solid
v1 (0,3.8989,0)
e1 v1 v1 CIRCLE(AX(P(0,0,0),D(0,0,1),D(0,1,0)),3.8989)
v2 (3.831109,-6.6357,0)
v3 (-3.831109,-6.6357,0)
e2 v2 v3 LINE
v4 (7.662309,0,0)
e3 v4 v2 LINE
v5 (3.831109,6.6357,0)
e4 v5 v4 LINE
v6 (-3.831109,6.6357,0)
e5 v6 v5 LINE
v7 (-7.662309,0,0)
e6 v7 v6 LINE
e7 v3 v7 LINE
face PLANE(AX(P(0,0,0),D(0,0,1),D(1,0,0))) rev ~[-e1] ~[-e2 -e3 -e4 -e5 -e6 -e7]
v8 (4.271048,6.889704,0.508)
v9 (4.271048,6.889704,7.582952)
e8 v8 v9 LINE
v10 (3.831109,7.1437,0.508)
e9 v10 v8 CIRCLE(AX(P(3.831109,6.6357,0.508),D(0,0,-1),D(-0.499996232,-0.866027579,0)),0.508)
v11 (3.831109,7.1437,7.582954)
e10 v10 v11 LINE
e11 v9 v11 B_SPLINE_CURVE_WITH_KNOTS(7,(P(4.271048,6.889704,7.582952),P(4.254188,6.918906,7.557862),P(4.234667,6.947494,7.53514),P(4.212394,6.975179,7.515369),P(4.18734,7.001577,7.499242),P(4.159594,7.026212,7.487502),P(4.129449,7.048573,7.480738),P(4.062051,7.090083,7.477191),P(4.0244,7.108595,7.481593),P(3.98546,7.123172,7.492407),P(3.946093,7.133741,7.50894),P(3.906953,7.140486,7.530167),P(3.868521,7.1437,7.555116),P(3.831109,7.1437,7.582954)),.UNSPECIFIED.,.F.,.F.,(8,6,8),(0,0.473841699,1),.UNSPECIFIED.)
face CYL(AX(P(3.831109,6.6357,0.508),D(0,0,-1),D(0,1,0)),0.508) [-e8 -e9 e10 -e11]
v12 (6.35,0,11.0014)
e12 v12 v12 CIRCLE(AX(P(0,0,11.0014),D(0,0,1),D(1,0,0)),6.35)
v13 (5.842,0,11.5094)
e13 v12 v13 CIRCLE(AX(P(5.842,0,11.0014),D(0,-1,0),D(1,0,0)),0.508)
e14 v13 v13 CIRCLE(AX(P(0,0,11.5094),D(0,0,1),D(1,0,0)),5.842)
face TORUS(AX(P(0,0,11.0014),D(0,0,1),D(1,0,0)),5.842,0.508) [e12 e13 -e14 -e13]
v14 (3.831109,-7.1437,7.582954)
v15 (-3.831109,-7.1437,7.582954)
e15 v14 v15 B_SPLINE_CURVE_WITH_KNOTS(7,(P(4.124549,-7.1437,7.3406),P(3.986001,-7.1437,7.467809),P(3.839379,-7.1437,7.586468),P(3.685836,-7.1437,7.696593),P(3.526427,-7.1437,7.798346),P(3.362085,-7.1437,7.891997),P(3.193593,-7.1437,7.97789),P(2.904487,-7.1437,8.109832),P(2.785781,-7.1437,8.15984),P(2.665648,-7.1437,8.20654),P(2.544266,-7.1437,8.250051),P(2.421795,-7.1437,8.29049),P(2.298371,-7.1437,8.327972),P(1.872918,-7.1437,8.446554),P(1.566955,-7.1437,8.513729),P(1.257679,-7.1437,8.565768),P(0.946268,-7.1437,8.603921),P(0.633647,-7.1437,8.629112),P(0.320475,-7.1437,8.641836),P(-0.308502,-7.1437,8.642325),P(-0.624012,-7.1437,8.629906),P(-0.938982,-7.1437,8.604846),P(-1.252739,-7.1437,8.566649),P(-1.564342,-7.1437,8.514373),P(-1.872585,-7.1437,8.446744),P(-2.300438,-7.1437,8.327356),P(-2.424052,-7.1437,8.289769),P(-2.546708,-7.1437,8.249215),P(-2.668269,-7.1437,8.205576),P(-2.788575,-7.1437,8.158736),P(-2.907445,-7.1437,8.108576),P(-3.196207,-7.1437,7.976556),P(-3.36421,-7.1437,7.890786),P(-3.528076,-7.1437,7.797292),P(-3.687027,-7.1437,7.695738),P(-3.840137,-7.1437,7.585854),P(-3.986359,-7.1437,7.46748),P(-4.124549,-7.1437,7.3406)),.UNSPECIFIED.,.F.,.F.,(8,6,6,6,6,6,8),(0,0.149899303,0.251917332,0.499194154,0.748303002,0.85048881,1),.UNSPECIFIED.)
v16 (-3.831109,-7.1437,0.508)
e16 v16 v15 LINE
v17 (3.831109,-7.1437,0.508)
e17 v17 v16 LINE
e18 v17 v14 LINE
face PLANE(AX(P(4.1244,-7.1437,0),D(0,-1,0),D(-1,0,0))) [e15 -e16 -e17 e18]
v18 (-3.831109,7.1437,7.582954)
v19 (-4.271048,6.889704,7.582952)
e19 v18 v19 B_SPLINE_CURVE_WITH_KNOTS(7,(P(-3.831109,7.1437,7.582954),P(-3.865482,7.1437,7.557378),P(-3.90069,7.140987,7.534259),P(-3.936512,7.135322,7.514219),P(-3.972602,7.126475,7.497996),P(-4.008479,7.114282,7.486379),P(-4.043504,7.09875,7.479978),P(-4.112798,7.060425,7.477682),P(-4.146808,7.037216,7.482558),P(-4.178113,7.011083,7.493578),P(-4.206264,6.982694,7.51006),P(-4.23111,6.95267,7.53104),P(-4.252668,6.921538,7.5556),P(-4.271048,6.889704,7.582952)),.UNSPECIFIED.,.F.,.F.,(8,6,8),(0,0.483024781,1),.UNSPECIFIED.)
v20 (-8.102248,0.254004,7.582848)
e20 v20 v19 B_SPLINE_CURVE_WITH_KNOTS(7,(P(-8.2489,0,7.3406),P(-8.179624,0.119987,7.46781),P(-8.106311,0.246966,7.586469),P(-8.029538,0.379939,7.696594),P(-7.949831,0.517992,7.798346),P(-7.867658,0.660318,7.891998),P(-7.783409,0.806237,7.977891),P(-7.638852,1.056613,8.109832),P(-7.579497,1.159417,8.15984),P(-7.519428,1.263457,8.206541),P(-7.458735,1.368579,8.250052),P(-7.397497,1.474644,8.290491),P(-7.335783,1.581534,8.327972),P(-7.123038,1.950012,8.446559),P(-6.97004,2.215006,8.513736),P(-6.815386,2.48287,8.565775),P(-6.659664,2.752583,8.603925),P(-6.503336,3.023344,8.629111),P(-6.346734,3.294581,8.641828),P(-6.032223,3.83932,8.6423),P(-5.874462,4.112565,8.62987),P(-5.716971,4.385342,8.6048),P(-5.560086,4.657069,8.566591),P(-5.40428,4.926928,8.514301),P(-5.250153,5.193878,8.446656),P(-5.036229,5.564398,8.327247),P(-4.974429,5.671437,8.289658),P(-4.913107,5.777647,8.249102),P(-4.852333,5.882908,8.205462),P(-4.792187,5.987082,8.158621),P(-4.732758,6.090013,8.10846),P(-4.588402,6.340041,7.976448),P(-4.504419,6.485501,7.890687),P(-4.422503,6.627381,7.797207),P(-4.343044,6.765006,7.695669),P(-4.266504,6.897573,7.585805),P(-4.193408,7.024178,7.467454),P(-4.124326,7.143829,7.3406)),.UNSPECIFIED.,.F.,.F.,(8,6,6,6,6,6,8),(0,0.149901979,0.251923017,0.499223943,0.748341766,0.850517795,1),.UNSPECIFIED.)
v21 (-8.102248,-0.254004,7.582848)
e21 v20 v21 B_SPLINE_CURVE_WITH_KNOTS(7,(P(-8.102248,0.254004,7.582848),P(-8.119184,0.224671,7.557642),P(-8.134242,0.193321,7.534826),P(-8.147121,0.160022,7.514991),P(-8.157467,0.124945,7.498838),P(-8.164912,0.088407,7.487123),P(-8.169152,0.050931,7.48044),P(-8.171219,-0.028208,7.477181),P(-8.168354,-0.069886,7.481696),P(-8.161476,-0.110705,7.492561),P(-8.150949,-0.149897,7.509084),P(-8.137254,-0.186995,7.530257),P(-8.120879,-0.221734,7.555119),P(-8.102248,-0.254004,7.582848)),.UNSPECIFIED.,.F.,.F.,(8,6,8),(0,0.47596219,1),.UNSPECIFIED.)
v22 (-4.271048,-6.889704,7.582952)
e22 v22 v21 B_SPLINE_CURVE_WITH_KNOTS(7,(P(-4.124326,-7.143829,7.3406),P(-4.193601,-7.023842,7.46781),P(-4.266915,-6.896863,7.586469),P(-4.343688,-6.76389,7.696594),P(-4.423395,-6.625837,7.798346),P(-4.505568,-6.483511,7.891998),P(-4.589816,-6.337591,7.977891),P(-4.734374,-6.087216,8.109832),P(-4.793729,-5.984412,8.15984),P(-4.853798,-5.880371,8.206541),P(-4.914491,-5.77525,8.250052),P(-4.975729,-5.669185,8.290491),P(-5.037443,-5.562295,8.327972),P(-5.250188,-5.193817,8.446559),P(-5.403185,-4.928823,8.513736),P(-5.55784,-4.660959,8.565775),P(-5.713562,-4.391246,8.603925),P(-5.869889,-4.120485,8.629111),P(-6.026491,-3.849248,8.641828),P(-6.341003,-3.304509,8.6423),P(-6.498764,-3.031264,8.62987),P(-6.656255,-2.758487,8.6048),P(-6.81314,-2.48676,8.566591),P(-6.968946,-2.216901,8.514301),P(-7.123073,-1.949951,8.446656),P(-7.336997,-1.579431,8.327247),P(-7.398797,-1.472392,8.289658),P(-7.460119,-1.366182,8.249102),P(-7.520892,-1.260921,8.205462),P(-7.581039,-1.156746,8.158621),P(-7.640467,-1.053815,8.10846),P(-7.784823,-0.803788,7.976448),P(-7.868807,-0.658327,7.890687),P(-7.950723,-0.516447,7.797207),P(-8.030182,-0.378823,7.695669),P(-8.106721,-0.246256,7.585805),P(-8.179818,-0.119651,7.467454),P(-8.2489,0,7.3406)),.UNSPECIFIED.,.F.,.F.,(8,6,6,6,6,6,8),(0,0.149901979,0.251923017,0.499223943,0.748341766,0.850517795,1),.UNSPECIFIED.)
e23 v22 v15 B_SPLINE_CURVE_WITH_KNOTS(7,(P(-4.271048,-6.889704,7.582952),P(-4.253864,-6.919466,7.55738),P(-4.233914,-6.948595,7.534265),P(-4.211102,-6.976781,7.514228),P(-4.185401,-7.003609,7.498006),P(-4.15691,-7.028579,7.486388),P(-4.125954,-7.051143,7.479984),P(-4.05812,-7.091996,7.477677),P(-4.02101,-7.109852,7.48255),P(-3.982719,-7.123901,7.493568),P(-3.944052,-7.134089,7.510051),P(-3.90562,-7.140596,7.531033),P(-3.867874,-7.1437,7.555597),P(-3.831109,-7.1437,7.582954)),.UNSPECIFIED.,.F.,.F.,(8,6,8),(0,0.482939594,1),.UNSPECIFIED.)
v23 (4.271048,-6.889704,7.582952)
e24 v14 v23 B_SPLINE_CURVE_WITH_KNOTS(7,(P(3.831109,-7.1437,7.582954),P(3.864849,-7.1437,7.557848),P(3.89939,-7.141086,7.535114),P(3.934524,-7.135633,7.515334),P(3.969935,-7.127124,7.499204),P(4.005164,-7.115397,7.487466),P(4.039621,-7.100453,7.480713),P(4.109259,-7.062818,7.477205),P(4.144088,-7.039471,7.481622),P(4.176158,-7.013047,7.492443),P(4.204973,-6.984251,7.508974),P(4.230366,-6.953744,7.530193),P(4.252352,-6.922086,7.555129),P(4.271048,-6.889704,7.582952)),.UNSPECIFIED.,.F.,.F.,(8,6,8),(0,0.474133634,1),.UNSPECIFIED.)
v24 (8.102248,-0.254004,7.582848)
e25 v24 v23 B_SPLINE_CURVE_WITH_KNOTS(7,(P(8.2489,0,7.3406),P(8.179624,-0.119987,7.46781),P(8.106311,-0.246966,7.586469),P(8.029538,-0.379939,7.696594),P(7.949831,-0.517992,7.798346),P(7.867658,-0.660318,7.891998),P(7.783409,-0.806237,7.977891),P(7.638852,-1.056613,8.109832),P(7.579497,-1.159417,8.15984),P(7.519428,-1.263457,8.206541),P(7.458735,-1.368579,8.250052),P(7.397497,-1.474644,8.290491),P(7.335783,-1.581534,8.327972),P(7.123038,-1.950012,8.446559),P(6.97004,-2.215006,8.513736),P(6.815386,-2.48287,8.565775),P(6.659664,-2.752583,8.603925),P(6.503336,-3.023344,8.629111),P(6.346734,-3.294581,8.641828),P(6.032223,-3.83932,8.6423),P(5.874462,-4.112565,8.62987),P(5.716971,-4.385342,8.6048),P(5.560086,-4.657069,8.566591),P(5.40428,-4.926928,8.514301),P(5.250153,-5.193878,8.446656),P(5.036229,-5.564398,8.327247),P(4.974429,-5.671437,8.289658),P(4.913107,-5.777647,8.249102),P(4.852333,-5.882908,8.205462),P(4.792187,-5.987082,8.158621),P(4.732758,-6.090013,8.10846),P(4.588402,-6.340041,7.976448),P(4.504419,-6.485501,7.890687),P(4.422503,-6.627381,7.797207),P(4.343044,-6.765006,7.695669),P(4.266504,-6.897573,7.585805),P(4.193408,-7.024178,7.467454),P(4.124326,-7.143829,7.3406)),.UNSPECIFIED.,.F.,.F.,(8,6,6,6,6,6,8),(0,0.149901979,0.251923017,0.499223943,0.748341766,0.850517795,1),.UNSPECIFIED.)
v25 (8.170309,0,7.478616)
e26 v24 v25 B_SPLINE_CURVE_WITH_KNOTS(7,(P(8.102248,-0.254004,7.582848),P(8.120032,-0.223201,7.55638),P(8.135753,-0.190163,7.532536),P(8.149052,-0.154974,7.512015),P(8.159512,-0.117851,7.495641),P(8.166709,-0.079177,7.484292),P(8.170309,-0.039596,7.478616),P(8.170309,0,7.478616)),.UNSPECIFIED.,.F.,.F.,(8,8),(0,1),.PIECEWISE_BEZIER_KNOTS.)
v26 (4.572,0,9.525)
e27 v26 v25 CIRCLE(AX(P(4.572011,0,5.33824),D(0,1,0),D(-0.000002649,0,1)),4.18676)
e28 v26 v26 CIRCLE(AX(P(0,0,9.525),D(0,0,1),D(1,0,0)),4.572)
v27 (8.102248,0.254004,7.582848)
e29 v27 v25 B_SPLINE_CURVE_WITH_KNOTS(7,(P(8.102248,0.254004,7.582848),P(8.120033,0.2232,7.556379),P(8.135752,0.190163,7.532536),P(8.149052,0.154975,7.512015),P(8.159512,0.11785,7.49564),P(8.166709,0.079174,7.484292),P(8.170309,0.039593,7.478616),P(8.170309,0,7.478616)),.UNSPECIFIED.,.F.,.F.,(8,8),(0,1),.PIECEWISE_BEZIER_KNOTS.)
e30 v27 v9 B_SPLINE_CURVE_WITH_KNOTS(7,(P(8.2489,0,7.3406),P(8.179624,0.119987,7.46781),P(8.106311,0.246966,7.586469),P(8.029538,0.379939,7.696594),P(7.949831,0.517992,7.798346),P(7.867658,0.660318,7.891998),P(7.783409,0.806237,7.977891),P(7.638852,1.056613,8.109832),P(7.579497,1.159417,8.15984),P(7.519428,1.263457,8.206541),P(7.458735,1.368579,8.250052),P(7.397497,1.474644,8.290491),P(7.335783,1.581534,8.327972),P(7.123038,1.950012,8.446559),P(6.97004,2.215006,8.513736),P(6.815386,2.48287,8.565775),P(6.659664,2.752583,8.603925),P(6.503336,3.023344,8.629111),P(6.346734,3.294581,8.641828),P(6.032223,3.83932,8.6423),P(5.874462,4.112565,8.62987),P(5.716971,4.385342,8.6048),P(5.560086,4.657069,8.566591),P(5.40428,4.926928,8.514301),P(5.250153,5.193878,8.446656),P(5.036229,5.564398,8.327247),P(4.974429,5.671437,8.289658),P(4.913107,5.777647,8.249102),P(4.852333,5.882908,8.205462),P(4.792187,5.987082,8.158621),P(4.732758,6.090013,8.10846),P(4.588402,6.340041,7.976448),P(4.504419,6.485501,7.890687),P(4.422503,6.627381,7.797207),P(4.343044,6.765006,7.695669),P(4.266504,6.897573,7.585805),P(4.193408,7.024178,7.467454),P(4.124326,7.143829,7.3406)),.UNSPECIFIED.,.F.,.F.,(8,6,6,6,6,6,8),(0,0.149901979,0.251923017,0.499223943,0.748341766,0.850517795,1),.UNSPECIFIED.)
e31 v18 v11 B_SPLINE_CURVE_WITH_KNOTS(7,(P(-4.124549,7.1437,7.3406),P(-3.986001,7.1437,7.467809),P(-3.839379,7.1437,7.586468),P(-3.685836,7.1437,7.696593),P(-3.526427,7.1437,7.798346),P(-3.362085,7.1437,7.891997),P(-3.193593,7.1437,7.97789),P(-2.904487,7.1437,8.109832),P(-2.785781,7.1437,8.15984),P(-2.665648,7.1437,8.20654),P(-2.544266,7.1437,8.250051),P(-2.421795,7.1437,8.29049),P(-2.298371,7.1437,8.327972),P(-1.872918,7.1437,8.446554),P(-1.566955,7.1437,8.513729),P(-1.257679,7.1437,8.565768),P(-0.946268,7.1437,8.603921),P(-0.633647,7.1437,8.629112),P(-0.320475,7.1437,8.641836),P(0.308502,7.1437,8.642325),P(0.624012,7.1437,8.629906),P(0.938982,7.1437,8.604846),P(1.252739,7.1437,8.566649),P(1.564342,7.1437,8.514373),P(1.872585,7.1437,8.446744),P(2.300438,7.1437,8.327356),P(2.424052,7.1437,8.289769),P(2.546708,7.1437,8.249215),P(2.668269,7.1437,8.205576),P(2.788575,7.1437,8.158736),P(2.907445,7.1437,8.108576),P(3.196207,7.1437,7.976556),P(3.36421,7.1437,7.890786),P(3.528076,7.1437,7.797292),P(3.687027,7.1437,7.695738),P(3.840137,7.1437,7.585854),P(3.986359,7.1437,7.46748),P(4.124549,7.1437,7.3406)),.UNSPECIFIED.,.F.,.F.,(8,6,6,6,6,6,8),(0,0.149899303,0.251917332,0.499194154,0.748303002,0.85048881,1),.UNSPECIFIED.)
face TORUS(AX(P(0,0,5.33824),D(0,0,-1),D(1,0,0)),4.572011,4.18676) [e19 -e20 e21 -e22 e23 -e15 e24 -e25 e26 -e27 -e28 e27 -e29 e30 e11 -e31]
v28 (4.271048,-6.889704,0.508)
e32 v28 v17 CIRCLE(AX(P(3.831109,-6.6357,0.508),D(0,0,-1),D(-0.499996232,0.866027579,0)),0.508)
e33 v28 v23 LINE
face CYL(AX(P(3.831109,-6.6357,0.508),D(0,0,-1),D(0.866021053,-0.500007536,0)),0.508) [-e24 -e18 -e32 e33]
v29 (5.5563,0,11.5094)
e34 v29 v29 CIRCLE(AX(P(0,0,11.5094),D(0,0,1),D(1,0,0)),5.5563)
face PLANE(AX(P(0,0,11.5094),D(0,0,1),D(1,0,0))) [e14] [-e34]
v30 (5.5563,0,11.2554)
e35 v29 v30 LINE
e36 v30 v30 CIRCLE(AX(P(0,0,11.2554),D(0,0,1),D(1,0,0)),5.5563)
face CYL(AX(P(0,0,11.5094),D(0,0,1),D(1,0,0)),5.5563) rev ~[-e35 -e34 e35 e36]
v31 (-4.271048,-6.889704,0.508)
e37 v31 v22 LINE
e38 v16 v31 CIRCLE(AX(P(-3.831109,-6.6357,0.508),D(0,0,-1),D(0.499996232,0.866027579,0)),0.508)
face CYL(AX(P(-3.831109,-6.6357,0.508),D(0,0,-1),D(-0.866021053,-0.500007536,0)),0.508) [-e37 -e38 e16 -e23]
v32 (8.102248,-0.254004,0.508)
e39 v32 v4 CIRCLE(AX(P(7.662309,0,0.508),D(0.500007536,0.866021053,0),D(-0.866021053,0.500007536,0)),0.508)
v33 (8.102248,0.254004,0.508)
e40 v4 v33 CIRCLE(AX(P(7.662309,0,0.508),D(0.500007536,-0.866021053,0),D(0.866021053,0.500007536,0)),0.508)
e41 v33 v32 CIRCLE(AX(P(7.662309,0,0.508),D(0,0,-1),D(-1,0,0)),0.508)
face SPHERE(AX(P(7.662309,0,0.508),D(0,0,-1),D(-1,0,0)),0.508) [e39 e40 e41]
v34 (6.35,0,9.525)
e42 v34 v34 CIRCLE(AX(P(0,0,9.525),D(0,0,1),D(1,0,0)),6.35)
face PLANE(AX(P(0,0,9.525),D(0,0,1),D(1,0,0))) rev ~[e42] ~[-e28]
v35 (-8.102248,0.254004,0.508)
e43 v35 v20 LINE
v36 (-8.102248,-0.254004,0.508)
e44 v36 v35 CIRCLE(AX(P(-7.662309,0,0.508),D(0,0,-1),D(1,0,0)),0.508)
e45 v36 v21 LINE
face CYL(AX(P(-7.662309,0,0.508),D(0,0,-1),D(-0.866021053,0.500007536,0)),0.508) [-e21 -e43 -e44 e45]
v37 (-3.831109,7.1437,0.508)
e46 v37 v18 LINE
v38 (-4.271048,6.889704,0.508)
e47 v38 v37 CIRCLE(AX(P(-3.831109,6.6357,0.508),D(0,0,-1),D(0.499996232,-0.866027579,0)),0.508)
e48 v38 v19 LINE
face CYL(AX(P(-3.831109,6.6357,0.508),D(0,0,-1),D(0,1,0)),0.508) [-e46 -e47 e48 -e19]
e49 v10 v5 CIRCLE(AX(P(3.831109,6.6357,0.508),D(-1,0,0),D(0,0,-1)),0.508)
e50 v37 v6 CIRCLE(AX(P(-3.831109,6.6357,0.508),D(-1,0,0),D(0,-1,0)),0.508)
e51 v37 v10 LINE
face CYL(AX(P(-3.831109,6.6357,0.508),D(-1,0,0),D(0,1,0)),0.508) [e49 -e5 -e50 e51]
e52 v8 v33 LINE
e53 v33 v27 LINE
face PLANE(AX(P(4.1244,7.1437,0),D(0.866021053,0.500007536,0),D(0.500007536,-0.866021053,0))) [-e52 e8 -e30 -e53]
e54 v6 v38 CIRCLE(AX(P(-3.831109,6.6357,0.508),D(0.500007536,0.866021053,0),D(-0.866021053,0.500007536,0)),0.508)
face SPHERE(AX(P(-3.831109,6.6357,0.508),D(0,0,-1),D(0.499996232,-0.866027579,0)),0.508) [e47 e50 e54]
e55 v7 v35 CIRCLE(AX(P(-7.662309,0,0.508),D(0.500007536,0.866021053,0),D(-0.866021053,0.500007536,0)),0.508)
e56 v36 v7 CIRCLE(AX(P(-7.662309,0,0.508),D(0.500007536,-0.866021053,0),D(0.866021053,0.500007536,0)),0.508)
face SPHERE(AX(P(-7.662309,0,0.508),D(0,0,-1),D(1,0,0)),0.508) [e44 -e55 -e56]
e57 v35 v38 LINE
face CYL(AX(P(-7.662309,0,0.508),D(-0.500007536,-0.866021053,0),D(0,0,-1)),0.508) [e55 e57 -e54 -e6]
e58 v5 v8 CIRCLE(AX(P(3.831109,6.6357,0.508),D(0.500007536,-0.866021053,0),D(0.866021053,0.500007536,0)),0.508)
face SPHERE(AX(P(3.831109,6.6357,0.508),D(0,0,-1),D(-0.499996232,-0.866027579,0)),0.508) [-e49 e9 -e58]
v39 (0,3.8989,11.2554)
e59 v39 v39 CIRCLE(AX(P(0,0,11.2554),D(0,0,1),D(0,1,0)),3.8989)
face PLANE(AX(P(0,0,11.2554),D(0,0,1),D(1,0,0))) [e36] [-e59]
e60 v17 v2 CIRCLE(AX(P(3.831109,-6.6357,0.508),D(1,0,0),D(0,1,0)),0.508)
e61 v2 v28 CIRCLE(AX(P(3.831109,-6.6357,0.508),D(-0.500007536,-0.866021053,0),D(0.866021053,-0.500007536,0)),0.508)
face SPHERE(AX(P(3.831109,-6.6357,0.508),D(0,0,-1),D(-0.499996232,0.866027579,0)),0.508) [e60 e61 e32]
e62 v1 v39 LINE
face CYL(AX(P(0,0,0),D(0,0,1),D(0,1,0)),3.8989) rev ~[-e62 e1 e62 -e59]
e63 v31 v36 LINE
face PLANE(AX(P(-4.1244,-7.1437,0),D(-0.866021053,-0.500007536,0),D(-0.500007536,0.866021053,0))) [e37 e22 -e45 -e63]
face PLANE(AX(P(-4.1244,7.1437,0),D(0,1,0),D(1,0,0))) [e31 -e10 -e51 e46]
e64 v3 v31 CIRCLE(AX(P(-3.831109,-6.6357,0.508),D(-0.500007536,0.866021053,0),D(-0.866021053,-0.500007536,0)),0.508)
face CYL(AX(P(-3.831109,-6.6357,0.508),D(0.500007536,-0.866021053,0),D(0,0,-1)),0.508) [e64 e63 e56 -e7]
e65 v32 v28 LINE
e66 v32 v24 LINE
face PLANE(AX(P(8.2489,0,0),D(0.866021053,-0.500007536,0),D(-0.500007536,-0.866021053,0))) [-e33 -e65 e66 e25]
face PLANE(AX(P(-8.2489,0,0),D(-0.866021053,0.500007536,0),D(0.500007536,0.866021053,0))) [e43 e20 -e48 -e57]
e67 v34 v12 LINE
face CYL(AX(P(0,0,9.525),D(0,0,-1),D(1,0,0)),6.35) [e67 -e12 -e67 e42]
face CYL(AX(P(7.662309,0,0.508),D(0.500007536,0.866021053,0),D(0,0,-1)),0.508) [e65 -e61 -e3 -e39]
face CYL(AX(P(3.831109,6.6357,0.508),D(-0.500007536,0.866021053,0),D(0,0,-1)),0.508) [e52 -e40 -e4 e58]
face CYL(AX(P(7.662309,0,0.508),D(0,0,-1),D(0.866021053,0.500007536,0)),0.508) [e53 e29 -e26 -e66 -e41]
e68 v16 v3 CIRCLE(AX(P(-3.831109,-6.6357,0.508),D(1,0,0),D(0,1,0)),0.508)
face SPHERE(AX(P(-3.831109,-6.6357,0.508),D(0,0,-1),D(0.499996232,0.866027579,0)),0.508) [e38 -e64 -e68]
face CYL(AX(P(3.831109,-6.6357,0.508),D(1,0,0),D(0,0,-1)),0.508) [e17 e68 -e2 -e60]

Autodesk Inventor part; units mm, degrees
ref_plane "YZ Plane" through (0, 0, 0) normal (1, 0, 0) x (0, 1, 0)
ref_plane "XZ Plane" through (0, 0, 0) normal (0, 1, 0) x (-1, 0, 0)
ref_plane "XY Plane" through (0, 0, 0) normal (0, 0, 1) x (1, 0, 0)
sketch "Sketch1" plane through (0, 0, 0) normal (0, 0, 1) x (1, 0, 0)
  line L0 (-4.1244, 7.1437) -> (4.1244, 7.1437)
  line L1 (4.1244, 7.1437) -> (8.2489, 0)
  line L2 (8.2489, 0) -> (4.1244, -7.1437)
  line L3 (4.1244, -7.1437) -> (-4.1244, -7.1437)
  line L4 (-4.1244, -7.1437) -> (-8.2489, 0)
  line L5 (-8.2489, 0) -> (-4.1244, 7.1437)
  point P0 (0, 0)
  point P1 (0, 0)
  dimension "d0" = 14.2875
extrude "Extrusion1" add sketch "Sketch1" along normal blind 9.525
sketch "Sketch3" plane through (0, 0, 9.525) normal (0, 0, 1) x (1, 0, 0)
  circle A0 centre (0, 0) radius 6.35
  dimension "d3" = 12.7
extrude "Extrusion2" add sketch "Sketch3" along normal blind 1.9844
sketch "Sketch8" plane through (0, 0, 11.5094) normal (0, 0, 1) x (1, 0, 0)
  circle A0 centre (0, 0) radius 6.35 projected
  circle A1 centre (0, 0) radius 5.5563
  circle A2 centre (0, 0) radius 5.1594
  dimension "d14" = 11.1125
  dimension "d28" = 10.3187
extrude "Extrusion3" cut sketch "Sketch8" against normal blind 0.254 contours A1 | A2
sketch "Sketch9" plane through (0, 0, 0) normal (0, 0, -1) x (-1, 0, 0)
  point P0 (0, 0)
hole "Hole2" at (0, 0, 0) direction (0, 0, 1) diameter 7.7978 end through all thread size "3/8-16 UNC" class "2B" standard "ANSI Unified Screw Threads"
sketch "Sketch10" plane through (0, 0, 0) normal (0, 1, 0) x (-1, 0, 0)
  line L0 (-8.2489, 9.525) -> (-4.1244, 9.525) projected
  line L1 (-4.1244, 0) -> (-4.1244, 9.525) projected
  line L2 (-8.2489, 0) -> (-4.1244, 0) projected
  line L3 (-8.2489, 0) -> (-8.2489, 9.525) projected
  line L4 (0, 0) -> (0, 6.9243)
  arc A0 (-4.572, 9.525) -> (-8.2489, 7.3406) centre (-4.572, 5.3382) ccw
  line L5 (-8.2489, 7.3406) -> (-8.2489, 9.525)
  line L6 (-4.572, 9.525) -> (-8.2489, 9.525)
  dimension "d24" = 4.572
revolve "Revolution2" cut sketch "Sketch10" angle 360 about axis through (0, 0, 0) along (0, 0, 1) contours L0 A0 L3
fillet "Fillet1" radius 0.508 12 edges at (-4.1244, -7.1437, 3.6703) (4.1244, -7.1437, 3.6703) (8.2489, 0, 3.6703) (4.1244, 7.1437, 3.6703) (-8.2489, 0, 3.6703) (-4.1244, 7.1437, 3.6703) (0, 7.1437, 0) (6.1867, 3.5719, 0) (6.1867, -3.5719, 0) (0, -7.1437, 0) (-6.1867, -3.5719, 0) (-6.1867, 3.5719, 0)
fillet "Fillet2" radius 0.508 1 edges at (-6.35, 0, 11.5094)
properties part number "10-32 regular lock nut" material "Steel"
